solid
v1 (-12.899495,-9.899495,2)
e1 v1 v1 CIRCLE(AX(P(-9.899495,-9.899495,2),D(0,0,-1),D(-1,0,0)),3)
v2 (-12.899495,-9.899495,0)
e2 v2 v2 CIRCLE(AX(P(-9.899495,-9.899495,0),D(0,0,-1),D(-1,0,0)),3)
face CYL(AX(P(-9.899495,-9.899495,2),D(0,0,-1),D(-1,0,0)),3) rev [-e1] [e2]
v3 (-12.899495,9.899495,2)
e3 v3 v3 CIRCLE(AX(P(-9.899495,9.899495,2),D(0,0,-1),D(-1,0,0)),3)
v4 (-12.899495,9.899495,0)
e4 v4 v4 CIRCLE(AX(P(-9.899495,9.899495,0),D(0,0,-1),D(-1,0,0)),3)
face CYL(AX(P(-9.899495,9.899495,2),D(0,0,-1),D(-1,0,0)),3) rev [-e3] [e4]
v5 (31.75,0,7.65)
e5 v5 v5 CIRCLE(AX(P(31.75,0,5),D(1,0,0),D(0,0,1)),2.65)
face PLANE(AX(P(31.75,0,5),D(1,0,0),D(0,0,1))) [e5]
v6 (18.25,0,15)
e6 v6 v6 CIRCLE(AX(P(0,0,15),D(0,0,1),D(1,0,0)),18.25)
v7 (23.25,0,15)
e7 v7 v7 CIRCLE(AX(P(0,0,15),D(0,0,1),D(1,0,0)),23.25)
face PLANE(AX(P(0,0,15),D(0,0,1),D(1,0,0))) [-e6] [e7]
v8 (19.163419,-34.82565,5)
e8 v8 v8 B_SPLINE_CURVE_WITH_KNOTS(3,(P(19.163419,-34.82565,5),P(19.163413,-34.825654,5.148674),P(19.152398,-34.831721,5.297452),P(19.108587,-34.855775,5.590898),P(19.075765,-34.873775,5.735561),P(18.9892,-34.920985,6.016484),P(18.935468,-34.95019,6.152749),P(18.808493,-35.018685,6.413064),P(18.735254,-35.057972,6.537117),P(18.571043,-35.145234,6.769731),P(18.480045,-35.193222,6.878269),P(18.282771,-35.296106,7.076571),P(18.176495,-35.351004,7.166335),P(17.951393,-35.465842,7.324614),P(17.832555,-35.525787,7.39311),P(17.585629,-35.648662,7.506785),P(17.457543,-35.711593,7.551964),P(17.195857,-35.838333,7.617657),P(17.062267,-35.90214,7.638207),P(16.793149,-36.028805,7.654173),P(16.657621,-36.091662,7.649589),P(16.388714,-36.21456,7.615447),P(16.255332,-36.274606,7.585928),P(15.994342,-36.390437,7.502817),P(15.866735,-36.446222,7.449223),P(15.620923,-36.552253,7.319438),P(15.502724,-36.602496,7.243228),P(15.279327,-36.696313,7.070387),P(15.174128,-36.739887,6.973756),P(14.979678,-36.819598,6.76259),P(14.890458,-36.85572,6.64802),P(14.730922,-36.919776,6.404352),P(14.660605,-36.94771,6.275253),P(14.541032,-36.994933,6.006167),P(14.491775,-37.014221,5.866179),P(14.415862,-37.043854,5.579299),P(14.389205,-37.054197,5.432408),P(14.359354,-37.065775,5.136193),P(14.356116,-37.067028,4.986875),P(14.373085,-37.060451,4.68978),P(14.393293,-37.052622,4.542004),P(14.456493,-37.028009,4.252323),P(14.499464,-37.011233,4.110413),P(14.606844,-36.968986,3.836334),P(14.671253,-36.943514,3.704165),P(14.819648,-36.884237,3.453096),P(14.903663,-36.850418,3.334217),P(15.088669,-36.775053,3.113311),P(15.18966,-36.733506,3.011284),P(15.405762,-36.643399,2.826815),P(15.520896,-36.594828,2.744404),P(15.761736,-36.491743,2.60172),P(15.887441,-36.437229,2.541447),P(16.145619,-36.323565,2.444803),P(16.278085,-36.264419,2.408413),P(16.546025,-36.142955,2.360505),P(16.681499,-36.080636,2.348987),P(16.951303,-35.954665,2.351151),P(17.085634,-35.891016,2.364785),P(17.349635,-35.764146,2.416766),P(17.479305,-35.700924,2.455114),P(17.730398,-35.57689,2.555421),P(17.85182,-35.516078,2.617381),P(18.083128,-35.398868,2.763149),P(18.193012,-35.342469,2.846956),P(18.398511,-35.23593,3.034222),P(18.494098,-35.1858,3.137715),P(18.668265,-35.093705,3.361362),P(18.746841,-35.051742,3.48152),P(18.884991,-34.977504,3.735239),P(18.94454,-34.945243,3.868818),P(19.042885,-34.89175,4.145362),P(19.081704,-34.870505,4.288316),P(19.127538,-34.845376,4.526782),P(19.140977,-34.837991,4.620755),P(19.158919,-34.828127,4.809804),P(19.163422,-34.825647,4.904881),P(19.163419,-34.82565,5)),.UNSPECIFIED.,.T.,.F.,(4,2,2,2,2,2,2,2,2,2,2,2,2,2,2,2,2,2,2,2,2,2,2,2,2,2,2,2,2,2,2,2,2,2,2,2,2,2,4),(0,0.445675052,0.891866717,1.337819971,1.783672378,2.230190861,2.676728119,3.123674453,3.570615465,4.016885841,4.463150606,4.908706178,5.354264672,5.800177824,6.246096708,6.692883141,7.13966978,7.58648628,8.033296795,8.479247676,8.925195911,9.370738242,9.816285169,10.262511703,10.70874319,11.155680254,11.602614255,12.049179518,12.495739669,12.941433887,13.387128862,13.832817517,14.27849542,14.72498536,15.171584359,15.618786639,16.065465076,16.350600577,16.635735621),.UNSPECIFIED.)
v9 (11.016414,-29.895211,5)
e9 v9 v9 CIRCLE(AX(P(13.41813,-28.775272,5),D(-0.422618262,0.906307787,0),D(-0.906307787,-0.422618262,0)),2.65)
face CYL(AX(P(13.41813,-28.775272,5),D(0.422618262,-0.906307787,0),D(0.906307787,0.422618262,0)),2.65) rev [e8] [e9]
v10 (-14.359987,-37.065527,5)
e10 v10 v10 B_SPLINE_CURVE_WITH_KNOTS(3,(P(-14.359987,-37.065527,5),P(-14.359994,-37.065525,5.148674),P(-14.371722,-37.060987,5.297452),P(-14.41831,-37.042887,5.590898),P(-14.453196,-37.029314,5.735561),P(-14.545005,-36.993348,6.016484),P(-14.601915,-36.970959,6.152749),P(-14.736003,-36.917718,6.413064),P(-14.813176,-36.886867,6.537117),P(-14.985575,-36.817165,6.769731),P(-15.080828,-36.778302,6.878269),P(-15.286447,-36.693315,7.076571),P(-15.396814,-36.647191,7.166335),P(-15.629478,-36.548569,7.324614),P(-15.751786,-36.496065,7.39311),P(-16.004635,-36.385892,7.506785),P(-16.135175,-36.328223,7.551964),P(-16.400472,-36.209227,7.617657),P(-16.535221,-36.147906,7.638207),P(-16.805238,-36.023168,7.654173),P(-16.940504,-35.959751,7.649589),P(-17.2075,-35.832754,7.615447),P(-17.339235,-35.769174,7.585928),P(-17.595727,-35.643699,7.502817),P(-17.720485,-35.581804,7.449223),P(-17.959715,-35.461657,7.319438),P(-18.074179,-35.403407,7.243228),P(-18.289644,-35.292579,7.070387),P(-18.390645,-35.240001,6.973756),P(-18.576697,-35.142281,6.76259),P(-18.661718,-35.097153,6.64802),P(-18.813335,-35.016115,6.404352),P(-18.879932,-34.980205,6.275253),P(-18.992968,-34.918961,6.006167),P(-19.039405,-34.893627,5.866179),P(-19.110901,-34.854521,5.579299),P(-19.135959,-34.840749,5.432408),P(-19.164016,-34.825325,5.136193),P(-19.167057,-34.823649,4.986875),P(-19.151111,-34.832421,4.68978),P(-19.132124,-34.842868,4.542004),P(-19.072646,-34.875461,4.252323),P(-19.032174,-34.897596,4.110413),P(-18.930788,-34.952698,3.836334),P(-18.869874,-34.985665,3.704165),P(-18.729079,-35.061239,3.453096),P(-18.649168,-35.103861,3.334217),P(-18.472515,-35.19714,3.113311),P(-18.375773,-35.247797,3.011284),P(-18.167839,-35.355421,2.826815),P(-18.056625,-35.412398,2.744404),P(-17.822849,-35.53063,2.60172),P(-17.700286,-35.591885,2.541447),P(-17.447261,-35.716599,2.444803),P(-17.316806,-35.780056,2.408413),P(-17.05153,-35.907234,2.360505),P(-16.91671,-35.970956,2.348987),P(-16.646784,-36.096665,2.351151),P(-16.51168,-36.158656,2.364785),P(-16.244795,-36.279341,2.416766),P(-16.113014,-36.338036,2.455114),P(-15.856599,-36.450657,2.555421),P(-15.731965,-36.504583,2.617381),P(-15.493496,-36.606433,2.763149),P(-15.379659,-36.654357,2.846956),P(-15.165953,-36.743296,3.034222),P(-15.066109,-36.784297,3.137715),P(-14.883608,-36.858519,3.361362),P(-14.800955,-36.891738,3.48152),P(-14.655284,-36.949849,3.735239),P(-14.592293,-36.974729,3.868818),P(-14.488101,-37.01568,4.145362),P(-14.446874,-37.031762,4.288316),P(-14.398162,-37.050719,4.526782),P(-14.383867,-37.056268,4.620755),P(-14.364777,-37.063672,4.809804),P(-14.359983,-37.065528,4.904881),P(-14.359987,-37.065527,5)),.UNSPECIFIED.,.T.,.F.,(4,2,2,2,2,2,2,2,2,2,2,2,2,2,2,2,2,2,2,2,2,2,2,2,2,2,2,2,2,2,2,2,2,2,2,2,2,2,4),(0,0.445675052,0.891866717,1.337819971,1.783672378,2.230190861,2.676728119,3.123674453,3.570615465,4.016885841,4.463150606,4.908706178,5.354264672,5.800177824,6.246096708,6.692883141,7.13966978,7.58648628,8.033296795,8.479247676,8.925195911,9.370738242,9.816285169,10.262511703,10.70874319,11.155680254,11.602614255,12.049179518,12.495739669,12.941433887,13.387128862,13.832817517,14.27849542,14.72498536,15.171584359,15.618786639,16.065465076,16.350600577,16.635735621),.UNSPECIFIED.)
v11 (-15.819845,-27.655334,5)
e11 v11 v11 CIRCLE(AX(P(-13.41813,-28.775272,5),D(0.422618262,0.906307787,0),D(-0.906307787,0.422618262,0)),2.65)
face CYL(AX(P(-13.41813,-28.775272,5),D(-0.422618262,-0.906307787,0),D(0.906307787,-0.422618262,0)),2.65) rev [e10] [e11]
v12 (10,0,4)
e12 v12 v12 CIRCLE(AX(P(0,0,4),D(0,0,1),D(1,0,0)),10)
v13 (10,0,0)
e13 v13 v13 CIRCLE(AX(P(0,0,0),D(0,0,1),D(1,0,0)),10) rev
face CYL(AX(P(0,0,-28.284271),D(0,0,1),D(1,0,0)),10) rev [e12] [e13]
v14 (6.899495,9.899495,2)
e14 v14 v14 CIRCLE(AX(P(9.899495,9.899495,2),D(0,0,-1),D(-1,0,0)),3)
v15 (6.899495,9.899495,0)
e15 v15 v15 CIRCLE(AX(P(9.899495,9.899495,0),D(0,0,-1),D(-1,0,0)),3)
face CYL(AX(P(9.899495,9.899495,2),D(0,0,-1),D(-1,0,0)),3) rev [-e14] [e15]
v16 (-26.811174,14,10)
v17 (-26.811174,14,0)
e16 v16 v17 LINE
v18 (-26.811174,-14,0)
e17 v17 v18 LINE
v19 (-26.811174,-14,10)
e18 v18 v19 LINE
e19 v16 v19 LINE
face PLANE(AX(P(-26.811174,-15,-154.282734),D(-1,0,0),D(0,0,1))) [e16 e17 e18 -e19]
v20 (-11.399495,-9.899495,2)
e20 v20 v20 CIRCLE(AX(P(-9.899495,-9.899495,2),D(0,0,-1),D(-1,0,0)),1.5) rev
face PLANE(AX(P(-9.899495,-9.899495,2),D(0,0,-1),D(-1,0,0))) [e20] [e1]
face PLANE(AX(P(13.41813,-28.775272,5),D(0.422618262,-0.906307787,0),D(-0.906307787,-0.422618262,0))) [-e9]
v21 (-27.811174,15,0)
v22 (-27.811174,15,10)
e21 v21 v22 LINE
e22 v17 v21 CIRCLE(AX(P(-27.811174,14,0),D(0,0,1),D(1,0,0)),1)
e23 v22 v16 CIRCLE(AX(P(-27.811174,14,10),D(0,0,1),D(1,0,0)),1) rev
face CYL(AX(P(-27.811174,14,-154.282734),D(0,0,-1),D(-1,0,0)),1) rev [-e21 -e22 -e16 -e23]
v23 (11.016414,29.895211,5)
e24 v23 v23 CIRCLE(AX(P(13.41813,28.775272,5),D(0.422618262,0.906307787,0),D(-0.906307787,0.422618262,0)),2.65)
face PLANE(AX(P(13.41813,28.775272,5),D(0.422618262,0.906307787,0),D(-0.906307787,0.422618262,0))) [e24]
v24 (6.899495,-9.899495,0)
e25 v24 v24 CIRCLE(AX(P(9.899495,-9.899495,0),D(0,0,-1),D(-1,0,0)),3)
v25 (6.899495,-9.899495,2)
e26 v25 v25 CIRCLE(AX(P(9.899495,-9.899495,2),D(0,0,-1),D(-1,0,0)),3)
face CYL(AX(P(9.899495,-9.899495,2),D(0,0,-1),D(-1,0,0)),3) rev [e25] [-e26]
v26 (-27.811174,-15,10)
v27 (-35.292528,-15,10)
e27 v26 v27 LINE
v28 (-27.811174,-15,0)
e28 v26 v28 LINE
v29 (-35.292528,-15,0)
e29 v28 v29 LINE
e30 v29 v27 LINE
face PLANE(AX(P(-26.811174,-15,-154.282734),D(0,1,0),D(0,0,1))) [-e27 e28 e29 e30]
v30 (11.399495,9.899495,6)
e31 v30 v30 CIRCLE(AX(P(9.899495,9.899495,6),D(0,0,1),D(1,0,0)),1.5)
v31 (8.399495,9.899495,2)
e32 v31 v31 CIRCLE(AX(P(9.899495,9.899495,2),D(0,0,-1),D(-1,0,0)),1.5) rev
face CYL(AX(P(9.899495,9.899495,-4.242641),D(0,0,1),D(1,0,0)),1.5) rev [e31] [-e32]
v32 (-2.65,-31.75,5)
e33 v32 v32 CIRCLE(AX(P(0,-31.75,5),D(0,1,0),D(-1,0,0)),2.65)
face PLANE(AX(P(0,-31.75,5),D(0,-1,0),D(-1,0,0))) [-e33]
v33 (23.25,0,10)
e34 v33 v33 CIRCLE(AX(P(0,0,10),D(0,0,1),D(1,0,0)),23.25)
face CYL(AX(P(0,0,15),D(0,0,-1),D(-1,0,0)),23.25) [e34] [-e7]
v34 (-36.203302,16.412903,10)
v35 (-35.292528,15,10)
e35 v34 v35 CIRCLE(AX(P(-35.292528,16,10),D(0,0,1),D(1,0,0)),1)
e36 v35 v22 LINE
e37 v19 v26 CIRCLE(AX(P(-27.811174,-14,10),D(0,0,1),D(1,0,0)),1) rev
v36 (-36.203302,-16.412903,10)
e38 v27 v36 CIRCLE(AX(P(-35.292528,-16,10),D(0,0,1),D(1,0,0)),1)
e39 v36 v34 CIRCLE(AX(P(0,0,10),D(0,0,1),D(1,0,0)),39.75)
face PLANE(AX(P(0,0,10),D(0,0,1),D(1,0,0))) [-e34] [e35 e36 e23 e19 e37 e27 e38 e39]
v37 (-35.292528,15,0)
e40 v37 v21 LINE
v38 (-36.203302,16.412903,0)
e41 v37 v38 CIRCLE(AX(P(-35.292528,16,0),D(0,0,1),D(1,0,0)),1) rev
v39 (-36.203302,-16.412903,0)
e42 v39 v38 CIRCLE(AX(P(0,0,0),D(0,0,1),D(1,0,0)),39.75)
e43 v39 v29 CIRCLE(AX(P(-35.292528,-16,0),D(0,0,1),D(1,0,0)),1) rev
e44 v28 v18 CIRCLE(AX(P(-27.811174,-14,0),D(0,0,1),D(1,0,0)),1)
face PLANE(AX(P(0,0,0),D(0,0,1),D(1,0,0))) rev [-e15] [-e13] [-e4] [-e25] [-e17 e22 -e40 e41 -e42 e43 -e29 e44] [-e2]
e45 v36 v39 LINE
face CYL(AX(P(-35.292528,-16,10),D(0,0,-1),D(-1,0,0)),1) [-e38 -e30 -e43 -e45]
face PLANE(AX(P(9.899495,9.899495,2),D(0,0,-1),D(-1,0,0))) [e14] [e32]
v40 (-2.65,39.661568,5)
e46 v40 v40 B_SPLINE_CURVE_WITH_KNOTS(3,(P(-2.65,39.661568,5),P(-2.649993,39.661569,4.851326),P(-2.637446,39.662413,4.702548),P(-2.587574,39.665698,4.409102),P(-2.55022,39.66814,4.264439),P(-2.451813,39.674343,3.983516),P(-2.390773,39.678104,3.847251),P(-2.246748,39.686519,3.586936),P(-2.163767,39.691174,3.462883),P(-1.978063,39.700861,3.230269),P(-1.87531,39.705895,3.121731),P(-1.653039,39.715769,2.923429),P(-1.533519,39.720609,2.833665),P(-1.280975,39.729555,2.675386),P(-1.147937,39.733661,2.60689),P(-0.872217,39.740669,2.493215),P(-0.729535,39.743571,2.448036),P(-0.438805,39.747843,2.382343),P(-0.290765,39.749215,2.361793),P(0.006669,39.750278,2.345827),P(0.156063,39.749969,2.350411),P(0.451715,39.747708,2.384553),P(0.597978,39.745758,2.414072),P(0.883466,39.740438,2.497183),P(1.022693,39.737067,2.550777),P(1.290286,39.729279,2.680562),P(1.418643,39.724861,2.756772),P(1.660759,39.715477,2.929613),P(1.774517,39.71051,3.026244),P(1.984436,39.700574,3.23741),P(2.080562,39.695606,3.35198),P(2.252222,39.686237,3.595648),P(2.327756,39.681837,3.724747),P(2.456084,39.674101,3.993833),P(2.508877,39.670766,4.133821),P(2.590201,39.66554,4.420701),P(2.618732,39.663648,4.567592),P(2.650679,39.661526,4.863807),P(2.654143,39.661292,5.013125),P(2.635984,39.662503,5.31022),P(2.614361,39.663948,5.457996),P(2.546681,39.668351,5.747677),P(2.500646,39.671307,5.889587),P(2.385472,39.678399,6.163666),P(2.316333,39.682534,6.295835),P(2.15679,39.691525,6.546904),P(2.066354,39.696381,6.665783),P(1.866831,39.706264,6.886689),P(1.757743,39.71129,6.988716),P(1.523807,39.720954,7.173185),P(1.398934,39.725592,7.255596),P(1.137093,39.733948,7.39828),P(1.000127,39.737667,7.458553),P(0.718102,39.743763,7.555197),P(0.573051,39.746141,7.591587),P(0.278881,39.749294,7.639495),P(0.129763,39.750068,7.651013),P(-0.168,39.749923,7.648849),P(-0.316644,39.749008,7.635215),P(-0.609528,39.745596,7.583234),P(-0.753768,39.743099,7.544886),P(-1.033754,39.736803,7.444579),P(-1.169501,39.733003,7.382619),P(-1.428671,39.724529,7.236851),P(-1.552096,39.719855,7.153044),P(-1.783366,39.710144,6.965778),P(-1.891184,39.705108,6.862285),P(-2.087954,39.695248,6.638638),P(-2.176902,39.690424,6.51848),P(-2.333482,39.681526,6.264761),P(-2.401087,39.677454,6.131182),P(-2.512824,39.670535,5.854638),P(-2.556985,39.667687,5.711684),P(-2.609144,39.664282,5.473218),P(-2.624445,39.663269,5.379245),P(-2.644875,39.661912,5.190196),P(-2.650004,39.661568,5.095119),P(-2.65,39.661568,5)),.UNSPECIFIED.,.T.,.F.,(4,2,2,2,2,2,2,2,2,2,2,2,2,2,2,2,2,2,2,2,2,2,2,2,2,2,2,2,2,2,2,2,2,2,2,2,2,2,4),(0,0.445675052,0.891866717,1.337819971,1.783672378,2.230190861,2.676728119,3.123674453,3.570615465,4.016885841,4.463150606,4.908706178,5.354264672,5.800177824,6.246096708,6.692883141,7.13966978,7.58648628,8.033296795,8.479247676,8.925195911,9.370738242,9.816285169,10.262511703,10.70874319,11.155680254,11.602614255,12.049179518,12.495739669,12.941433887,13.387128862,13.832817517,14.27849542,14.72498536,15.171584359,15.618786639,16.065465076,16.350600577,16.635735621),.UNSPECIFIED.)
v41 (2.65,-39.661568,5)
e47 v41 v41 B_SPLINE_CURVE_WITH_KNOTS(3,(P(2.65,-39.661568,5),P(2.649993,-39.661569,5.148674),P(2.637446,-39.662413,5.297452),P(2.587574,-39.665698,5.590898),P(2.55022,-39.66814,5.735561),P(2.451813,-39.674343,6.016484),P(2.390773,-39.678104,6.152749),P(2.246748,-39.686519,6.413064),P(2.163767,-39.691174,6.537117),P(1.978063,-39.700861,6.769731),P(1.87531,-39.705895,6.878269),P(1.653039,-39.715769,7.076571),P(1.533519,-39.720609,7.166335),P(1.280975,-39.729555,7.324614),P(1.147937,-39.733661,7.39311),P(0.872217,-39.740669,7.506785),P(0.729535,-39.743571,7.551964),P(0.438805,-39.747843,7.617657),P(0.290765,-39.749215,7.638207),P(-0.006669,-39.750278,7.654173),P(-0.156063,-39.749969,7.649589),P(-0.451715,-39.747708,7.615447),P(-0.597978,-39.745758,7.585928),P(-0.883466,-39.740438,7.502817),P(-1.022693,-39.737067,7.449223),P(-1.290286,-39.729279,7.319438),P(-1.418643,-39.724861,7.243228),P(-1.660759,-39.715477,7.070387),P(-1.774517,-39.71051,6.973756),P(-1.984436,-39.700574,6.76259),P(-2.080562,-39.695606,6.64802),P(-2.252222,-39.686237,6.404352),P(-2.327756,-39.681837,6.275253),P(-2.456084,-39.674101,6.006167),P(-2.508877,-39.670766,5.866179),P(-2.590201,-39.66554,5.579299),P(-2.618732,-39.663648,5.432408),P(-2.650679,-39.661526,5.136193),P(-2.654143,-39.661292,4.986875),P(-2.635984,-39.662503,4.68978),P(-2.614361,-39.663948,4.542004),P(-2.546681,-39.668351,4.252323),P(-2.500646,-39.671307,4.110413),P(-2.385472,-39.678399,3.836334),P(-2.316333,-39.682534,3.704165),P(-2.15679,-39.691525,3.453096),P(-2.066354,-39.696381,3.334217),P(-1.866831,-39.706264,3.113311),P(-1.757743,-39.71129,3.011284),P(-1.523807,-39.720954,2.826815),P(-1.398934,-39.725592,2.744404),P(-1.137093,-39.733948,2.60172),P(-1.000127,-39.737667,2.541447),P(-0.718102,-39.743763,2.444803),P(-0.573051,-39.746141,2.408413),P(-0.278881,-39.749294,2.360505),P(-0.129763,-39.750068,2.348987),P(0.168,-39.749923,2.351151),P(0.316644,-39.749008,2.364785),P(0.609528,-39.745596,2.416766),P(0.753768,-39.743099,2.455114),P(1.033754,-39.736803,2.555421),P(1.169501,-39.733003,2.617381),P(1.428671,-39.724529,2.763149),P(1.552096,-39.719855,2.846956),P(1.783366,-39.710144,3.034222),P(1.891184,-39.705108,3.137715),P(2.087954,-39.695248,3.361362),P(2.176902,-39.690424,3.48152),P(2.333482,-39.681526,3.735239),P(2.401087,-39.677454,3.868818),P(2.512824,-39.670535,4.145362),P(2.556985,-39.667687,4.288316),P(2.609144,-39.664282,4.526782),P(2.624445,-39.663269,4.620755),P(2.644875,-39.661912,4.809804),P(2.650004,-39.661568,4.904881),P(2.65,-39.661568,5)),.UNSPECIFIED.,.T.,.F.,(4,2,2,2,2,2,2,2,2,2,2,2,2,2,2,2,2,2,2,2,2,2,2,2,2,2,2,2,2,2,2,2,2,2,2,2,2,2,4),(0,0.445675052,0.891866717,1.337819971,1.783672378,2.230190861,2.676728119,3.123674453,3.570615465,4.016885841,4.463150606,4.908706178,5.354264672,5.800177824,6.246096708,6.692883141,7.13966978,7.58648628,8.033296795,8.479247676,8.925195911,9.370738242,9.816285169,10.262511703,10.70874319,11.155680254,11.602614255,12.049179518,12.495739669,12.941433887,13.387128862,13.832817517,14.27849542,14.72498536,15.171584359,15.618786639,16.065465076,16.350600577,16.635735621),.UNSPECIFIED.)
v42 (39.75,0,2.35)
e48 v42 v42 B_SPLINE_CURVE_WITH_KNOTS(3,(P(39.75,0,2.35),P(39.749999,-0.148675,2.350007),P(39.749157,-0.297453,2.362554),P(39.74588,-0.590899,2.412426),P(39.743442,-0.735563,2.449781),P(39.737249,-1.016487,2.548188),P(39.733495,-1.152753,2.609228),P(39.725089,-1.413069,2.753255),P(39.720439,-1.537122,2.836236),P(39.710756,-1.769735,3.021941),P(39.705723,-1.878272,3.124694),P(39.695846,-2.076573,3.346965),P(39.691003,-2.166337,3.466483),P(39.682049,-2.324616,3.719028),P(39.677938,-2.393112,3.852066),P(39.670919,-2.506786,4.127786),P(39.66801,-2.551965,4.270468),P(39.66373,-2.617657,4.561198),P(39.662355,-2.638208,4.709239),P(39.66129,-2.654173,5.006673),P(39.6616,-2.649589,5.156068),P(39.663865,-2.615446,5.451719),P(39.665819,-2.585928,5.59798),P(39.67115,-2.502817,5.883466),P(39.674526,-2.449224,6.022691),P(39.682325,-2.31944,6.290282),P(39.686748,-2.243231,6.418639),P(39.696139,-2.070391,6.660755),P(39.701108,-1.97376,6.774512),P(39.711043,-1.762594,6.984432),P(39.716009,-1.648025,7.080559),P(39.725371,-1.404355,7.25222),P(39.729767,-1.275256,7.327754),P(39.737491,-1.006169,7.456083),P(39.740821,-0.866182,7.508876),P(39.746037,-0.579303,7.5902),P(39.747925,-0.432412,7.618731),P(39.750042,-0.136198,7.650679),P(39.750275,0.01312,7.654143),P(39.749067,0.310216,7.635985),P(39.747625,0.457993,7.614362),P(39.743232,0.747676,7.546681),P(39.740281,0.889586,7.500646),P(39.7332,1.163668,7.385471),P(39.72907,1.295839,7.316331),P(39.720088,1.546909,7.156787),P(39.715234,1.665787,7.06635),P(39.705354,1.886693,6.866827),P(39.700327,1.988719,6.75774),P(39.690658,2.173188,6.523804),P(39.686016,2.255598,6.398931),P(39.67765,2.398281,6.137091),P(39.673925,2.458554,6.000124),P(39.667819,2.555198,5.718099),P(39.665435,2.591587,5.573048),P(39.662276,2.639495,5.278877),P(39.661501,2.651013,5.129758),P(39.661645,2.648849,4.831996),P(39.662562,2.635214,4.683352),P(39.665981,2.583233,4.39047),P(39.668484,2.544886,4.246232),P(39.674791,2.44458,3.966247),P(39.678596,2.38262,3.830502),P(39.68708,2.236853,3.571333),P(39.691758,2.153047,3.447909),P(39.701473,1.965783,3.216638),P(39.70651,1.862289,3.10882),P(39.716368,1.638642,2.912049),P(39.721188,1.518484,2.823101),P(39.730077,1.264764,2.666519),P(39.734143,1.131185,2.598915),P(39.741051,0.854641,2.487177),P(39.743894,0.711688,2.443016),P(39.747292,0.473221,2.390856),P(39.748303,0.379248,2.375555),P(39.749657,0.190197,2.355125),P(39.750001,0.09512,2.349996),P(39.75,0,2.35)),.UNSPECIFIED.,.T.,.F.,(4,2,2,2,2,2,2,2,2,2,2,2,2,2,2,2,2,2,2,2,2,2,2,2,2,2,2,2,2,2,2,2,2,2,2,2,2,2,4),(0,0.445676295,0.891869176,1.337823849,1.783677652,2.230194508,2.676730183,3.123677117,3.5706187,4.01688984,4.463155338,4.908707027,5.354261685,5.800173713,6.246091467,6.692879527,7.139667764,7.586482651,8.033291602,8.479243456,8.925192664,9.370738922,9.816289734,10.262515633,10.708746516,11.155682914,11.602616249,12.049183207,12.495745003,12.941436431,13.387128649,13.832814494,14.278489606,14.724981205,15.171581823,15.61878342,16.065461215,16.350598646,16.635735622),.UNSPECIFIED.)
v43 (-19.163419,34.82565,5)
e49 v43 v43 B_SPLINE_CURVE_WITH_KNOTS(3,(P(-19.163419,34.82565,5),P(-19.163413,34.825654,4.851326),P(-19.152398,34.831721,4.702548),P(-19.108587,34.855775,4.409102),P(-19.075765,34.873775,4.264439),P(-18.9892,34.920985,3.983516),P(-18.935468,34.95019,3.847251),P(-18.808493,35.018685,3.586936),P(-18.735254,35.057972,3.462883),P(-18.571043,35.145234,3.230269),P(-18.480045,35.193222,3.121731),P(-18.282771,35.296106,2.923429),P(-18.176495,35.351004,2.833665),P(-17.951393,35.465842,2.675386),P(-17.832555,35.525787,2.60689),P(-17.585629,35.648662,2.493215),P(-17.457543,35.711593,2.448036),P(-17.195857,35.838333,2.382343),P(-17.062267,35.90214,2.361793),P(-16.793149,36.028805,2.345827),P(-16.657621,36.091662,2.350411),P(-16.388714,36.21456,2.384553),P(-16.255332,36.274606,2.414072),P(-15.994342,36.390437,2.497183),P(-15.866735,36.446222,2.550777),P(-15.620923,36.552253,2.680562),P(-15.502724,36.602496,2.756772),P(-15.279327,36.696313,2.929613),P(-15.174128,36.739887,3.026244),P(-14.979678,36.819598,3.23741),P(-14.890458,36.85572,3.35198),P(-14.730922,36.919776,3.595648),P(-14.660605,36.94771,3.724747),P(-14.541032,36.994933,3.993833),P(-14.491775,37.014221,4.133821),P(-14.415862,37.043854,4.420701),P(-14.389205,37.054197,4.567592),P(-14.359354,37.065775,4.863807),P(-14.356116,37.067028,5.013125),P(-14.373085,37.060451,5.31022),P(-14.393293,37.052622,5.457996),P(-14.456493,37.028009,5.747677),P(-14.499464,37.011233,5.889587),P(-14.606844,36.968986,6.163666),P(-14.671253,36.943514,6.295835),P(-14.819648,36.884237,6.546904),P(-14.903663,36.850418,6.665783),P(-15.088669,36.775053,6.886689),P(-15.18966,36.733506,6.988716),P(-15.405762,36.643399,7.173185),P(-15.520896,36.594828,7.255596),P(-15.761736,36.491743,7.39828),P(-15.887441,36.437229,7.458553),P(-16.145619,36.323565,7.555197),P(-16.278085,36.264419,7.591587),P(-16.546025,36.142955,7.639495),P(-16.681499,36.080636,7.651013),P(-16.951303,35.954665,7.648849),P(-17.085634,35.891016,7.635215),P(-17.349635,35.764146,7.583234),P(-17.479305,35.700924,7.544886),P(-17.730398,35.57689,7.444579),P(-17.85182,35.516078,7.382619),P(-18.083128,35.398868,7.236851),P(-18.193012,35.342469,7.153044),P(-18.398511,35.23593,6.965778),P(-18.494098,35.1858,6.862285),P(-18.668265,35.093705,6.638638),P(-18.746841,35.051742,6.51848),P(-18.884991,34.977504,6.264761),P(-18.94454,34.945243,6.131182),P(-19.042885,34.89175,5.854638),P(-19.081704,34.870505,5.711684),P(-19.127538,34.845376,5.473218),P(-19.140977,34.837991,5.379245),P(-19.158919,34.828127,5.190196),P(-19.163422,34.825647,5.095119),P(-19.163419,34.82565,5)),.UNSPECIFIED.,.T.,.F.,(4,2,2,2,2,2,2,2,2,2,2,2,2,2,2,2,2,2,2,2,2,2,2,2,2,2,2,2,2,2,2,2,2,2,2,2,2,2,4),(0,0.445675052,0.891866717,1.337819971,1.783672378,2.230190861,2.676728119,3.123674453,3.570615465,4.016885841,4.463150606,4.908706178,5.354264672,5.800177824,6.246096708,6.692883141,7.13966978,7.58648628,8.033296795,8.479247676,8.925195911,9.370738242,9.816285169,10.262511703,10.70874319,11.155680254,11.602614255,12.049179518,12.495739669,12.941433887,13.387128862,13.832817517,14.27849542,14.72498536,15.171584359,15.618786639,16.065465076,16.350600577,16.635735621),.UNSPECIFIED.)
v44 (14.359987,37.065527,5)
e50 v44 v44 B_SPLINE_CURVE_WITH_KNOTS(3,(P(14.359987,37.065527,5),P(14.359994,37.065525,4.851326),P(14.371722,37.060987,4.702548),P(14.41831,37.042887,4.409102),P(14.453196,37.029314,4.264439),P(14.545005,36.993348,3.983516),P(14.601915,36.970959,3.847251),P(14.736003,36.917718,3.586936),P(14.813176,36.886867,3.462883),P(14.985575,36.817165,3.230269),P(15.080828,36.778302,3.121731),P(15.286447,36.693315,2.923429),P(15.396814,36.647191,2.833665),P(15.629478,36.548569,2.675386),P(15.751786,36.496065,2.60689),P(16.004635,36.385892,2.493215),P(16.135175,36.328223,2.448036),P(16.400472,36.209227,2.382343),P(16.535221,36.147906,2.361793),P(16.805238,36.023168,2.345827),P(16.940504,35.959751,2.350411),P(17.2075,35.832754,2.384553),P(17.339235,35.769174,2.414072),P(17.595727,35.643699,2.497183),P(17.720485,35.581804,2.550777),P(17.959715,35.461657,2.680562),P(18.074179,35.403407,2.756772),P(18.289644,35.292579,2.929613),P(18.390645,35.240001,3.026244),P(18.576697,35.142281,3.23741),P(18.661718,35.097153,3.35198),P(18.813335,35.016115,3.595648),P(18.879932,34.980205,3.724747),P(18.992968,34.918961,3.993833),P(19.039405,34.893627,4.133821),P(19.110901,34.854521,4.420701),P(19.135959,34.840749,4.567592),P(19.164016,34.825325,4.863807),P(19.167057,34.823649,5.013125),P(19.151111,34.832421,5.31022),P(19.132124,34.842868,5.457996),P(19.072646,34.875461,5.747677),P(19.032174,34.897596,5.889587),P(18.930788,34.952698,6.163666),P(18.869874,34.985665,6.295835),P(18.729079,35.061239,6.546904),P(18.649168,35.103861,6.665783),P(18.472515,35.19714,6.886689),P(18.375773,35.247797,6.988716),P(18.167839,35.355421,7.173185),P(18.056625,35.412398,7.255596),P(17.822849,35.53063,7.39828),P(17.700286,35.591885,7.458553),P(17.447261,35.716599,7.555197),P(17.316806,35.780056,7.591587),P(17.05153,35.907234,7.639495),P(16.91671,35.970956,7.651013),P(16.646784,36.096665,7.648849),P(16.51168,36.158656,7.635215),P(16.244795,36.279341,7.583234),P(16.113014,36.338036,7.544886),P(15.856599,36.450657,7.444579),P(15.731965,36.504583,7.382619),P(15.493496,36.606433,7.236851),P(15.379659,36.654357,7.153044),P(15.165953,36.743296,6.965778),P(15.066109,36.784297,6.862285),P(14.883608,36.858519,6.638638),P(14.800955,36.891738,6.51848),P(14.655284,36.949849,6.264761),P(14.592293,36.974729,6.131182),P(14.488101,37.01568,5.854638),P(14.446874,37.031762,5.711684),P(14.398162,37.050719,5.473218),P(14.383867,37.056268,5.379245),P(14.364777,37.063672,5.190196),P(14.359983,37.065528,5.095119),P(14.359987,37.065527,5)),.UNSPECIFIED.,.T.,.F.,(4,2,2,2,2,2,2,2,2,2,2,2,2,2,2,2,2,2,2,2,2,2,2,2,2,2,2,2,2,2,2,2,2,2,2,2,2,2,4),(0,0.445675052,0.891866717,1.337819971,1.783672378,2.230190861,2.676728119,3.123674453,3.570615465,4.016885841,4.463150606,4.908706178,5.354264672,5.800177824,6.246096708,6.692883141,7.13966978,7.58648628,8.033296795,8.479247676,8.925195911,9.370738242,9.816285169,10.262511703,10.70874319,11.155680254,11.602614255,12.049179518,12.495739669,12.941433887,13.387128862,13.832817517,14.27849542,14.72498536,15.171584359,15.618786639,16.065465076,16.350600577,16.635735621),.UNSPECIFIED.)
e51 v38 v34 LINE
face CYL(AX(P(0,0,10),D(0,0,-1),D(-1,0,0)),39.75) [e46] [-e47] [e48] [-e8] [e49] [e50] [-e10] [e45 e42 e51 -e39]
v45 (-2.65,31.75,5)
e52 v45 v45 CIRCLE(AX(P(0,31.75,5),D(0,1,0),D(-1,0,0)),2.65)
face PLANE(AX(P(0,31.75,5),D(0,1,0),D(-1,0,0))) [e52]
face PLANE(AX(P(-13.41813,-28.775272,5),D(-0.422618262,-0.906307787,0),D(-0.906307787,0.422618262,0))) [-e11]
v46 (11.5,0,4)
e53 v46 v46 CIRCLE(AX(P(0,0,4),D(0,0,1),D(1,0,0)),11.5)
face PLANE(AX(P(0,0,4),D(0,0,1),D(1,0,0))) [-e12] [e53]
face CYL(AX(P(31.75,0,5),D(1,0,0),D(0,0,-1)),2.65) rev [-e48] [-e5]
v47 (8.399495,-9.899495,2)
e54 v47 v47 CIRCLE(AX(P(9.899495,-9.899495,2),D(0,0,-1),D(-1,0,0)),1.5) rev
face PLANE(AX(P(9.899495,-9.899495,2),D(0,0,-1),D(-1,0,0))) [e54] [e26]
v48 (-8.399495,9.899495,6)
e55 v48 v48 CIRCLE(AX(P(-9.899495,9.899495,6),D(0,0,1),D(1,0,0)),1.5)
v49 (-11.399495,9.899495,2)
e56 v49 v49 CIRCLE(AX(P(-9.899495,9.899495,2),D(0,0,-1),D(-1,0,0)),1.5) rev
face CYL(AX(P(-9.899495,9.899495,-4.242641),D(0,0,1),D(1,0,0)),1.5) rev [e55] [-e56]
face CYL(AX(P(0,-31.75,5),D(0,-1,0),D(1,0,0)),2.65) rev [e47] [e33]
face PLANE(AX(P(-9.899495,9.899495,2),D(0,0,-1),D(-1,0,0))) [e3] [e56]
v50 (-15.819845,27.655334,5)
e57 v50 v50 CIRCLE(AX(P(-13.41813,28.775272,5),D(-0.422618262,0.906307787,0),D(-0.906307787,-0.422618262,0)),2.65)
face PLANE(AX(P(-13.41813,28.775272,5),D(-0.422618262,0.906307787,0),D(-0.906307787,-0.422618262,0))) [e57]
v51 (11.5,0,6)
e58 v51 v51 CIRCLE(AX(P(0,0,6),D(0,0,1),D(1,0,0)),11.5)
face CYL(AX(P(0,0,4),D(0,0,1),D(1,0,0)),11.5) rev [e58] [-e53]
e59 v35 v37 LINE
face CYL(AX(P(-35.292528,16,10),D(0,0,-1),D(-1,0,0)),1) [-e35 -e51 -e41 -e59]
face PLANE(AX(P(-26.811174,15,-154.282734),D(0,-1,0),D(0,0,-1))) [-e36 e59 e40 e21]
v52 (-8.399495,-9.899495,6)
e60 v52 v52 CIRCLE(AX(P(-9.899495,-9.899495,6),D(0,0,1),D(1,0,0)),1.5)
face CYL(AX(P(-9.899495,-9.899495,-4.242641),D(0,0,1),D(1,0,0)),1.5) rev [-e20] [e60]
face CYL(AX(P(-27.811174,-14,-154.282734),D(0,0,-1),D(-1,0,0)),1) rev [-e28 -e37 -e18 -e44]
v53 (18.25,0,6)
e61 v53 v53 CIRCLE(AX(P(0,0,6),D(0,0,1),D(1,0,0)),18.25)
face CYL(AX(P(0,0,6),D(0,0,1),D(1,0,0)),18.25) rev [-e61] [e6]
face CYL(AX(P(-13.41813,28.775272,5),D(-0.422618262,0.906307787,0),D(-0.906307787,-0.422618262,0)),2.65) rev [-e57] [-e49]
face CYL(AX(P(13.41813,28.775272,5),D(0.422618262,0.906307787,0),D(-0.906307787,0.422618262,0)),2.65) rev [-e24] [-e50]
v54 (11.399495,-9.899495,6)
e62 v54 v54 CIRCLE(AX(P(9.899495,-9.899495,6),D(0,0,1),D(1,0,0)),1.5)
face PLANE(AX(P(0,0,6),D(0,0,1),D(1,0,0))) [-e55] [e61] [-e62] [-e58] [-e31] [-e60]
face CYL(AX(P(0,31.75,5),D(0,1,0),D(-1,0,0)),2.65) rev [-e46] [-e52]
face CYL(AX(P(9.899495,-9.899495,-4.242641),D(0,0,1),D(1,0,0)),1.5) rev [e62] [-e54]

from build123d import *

# Parameters (mm, degrees)
SKETCH_1_R               = 39.75
EXTRUDE_1_DEPTH          = 10
SKETCH_2_R               = 18.25
CUT_EXTRUDE_1_DEPTH      = 4
SKETCH_3_R               = 11.5
CUT_EXTRUDE_2_DEPTH      = 2
SKETCH_4_R               = 1.5
CUT_EXTRUDE_3_DEPTH      = 6
SKETCH_5_R               = 3
CUT_EXTRUDE_4_DEPTH      = 2
SKETCH_7_R               = 2.65
CUT_EXTRUDE_5_DEPTH      = 8
PATTERN_CIRCULAR_1_COUNT = 2
PATTERN_CIRCULAR_1_ANGLE = 25
F_1_THE_OTHER_WAY_COUNT  = 2
F_1_THE_OTHER_WAY_ANGLE  = 25
MIRROR_1_COPY_1_SKETCH_R = 2.65
MIRROR_1_COPY_1_DEPTH    = 8
MIRROR_1_COPY_2_SKETCH_R = 2.65
MIRROR_1_COPY_2_DEPTH    = 8
SKETCH_8_R               = 10
CUT_EXTRUDE_6_DEPTH      = 4
SKETCH_9_R               = 2.65
CUT_EXTRUDE_7_DEPTH      = 8
PATTERN_CIRCULAR_2_COUNT = 2
EXTRUDE_START            = 5
SKETCH_10_R              = 23.25
SKETCH_10_R_2            = 18.25
EXTRUDE_2_DEPTH          = 5
CUT_EXTRUDE_START        = -10
CUT_EXTRUDE_8_DEPTH      = 10
FILLET_1_R               = 1


# Read off the part's stored shape, not the designer's step: Вырез-Вытянуть8
with BuildPart() as part:
    # Эскиз1 → Бобышка-Вытянуть1 (new body)
    with BuildSketch(Plane.XY):
        Circle(SKETCH_1_R)
    extrude(amount=EXTRUDE_1_DEPTH)

    # Эскиз2 → Вырез-Вытянуть1 (cut)
    with BuildSketch(Plane.XY.offset(10)):
        Circle(SKETCH_2_R)
    extrude(amount=-CUT_EXTRUDE_1_DEPTH, mode=Mode.SUBTRACT)

    # Эскиз3 → Вырез-Вытянуть2 (cut)
    with BuildSketch(Plane.XY.offset(6)):
        Circle(SKETCH_3_R)
    extrude(amount=-CUT_EXTRUDE_2_DEPTH, mode=Mode.SUBTRACT)

    # Эскиз4 → Вырез-Вытянуть3 (cut)
    with BuildSketch(Plane.XY.offset(6)):
        with Locations((-9.899494937, 9.899494937)):
            Circle(SKETCH_4_R)
        with Locations((9.899494937, 9.899494937)):
            Circle(SKETCH_4_R)
        with Locations((9.899494937, -9.899494937)):
            Circle(SKETCH_4_R)
        with Locations((-9.899494937, -9.899494937)):
            Circle(SKETCH_4_R)
    extrude(amount=-CUT_EXTRUDE_3_DEPTH, mode=Mode.SUBTRACT)

    # Эскиз5 → Вырез-Вытянуть4 (cut)
    with BuildSketch(Plane(origin=(0, 0, 0), x_dir=(-1, 0, 0), z_dir=(0, 0, -1))):
        with Locations((-9.899494937, 9.899494937)):
            Circle(SKETCH_5_R)
        with Locations((9.899494937, 9.899494937)):
            Circle(SKETCH_5_R)
        with Locations((9.899494937, -9.899494937)):
            Circle(SKETCH_5_R)
        with Locations((-9.899494937, -9.899494937)):
            Circle(SKETCH_5_R)
    extrude(amount=-CUT_EXTRUDE_4_DEPTH, mode=Mode.SUBTRACT)

    # Эскиз7 → Вырез-Вытянуть5 (cut)
    with BuildSketch(Plane(origin=(0, 39.75, 0), x_dir=(0, 0, -1), z_dir=(0, 1, 0))):
        with Locations(Location((-5, 0, 0), (0, 0, 90))):
            Circle(SKETCH_7_R)
    cut_extrude_5 = extrude(amount=-CUT_EXTRUDE_5_DEPTH, mode=Mode.SUBTRACT)

    # Круговой массив1: Вырез-Вытянуть5 ×2 about axis
    pattern_circular_1_axis = Axis((0, 0, 10), (0, 0, -1))
    for i in range(1, PATTERN_CIRCULAR_1_COUNT):
        add(cut_extrude_5.rotate(pattern_circular_1_axis, i * PATTERN_CIRCULAR_1_ANGLE / (PATTERN_CIRCULAR_1_COUNT - 1)), mode=Mode.SUBTRACT)

    # 1 the other way: Вырез-Вытянуть5 ×2 about axis
    f_1_the_other_way_axis = Axis((0, 0, 10), (0, 0, 1))
    for i in range(1, F_1_THE_OTHER_WAY_COUNT):
        add(cut_extrude_5.rotate(f_1_the_other_way_axis, i * F_1_THE_OTHER_WAY_ANGLE / (F_1_THE_OTHER_WAY_COUNT - 1)), mode=Mode.SUBTRACT)

    # Зеркальное отражение1: Вырез-Вытянуть5 across plane
    add(cut_extrude_5.mirror(Plane.ZX), mode=Mode.SUBTRACT)

    # Зеркальное отражение1 copy 1 sketch → Зеркальное отражение1 copy 1 (cut)
    with BuildSketch(Plane(origin=(16.799075904, -36.025734535, 0), x_dir=(0, 0, -1), z_dir=(0.4226182617407035, -0.906307787036648, 0))):
        with Locations((-5, 0)):
            Circle(MIRROR_1_COPY_1_SKETCH_R)
    extrude(amount=-MIRROR_1_COPY_1_DEPTH, mode=Mode.SUBTRACT)

    # Зеркальное отражение1 copy 2 sketch → Зеркальное отражение1 copy 2 (cut)
    with BuildSketch(Plane(origin=(-16.799075904, -36.025734535, 0), x_dir=(0, 0, -1), z_dir=(-0.42261826174069717, -0.9063077870366509, 0))):
        with Locations((-5, 0)):
            Circle(MIRROR_1_COPY_2_SKETCH_R)
    extrude(amount=-MIRROR_1_COPY_2_DEPTH, mode=Mode.SUBTRACT)

    # Эскиз8 → Вырез-Вытянуть6 (cut)
    with BuildSketch(Plane.XY.offset(4)):
        Circle(SKETCH_8_R)
    extrude(amount=-CUT_EXTRUDE_6_DEPTH, mode=Mode.SUBTRACT)

    # Эскиз9 → Вырез-Вытянуть7 (cut)
    with BuildSketch(Plane.ZY.offset(39.75)):
        with Locations((5, 0)):
            Circle(SKETCH_9_R)
    cut_extrude_7 = extrude(amount=-CUT_EXTRUDE_7_DEPTH, mode=Mode.SUBTRACT)

    # Круговой массив2: Вырез-Вытянуть7 ×2 about axis
    pattern_circular_2_axis = Axis((0, 0, 10), (0, 0, -1))
    for i in range(1, PATTERN_CIRCULAR_2_COUNT):
        add(cut_extrude_7.rotate(pattern_circular_2_axis, i * 360 / PATTERN_CIRCULAR_2_COUNT), mode=Mode.SUBTRACT)

    # Эскиз10 → Бобышка-Вытянуть2 (add)
    with BuildSketch(Plane.XY.offset(10).offset(EXTRUDE_START)):
        Circle(SKETCH_10_R)
        Circle(SKETCH_10_R_2, mode=Mode.SUBTRACT)
    extrude(amount=-EXTRUDE_2_DEPTH)

    # Вырез-Вытянуть8 outline → Вырез-Вытянуть8 (cut)
    with BuildSketch(Plane(origin=(0, 0, 0), x_dir=(-1, 0, 0), z_dir=(0, 0, -1)).offset(CUT_EXTRUDE_START)):
        with BuildLine():
            Line((36.811173575, 15), (26.811173575, 15))
            Line((26.811173575, 15), (26.811173575, -15))
            Line((26.811173575, -15), (36.811173575, -15))
            ThreePointArc((36.811173575, -15), (39.75, 0), (36.811173575, 15))
        make_face()
    extrude(amount=CUT_EXTRUDE_8_DEPTH, mode=Mode.SUBTRACT)

    # Скругление1
    fillet_1_edges = [part.edges().sort_by_distance(p)[0] for p in [
        (-26.811173575, 15, 5),
        (-26.811173575, -15, 5),
        (-36.811173575, -15, 5),
        (-36.811173575, 15, 5),
    ]]
    fillet(fillet_1_edges, radius=FILLET_1_R)


solid = part.part
